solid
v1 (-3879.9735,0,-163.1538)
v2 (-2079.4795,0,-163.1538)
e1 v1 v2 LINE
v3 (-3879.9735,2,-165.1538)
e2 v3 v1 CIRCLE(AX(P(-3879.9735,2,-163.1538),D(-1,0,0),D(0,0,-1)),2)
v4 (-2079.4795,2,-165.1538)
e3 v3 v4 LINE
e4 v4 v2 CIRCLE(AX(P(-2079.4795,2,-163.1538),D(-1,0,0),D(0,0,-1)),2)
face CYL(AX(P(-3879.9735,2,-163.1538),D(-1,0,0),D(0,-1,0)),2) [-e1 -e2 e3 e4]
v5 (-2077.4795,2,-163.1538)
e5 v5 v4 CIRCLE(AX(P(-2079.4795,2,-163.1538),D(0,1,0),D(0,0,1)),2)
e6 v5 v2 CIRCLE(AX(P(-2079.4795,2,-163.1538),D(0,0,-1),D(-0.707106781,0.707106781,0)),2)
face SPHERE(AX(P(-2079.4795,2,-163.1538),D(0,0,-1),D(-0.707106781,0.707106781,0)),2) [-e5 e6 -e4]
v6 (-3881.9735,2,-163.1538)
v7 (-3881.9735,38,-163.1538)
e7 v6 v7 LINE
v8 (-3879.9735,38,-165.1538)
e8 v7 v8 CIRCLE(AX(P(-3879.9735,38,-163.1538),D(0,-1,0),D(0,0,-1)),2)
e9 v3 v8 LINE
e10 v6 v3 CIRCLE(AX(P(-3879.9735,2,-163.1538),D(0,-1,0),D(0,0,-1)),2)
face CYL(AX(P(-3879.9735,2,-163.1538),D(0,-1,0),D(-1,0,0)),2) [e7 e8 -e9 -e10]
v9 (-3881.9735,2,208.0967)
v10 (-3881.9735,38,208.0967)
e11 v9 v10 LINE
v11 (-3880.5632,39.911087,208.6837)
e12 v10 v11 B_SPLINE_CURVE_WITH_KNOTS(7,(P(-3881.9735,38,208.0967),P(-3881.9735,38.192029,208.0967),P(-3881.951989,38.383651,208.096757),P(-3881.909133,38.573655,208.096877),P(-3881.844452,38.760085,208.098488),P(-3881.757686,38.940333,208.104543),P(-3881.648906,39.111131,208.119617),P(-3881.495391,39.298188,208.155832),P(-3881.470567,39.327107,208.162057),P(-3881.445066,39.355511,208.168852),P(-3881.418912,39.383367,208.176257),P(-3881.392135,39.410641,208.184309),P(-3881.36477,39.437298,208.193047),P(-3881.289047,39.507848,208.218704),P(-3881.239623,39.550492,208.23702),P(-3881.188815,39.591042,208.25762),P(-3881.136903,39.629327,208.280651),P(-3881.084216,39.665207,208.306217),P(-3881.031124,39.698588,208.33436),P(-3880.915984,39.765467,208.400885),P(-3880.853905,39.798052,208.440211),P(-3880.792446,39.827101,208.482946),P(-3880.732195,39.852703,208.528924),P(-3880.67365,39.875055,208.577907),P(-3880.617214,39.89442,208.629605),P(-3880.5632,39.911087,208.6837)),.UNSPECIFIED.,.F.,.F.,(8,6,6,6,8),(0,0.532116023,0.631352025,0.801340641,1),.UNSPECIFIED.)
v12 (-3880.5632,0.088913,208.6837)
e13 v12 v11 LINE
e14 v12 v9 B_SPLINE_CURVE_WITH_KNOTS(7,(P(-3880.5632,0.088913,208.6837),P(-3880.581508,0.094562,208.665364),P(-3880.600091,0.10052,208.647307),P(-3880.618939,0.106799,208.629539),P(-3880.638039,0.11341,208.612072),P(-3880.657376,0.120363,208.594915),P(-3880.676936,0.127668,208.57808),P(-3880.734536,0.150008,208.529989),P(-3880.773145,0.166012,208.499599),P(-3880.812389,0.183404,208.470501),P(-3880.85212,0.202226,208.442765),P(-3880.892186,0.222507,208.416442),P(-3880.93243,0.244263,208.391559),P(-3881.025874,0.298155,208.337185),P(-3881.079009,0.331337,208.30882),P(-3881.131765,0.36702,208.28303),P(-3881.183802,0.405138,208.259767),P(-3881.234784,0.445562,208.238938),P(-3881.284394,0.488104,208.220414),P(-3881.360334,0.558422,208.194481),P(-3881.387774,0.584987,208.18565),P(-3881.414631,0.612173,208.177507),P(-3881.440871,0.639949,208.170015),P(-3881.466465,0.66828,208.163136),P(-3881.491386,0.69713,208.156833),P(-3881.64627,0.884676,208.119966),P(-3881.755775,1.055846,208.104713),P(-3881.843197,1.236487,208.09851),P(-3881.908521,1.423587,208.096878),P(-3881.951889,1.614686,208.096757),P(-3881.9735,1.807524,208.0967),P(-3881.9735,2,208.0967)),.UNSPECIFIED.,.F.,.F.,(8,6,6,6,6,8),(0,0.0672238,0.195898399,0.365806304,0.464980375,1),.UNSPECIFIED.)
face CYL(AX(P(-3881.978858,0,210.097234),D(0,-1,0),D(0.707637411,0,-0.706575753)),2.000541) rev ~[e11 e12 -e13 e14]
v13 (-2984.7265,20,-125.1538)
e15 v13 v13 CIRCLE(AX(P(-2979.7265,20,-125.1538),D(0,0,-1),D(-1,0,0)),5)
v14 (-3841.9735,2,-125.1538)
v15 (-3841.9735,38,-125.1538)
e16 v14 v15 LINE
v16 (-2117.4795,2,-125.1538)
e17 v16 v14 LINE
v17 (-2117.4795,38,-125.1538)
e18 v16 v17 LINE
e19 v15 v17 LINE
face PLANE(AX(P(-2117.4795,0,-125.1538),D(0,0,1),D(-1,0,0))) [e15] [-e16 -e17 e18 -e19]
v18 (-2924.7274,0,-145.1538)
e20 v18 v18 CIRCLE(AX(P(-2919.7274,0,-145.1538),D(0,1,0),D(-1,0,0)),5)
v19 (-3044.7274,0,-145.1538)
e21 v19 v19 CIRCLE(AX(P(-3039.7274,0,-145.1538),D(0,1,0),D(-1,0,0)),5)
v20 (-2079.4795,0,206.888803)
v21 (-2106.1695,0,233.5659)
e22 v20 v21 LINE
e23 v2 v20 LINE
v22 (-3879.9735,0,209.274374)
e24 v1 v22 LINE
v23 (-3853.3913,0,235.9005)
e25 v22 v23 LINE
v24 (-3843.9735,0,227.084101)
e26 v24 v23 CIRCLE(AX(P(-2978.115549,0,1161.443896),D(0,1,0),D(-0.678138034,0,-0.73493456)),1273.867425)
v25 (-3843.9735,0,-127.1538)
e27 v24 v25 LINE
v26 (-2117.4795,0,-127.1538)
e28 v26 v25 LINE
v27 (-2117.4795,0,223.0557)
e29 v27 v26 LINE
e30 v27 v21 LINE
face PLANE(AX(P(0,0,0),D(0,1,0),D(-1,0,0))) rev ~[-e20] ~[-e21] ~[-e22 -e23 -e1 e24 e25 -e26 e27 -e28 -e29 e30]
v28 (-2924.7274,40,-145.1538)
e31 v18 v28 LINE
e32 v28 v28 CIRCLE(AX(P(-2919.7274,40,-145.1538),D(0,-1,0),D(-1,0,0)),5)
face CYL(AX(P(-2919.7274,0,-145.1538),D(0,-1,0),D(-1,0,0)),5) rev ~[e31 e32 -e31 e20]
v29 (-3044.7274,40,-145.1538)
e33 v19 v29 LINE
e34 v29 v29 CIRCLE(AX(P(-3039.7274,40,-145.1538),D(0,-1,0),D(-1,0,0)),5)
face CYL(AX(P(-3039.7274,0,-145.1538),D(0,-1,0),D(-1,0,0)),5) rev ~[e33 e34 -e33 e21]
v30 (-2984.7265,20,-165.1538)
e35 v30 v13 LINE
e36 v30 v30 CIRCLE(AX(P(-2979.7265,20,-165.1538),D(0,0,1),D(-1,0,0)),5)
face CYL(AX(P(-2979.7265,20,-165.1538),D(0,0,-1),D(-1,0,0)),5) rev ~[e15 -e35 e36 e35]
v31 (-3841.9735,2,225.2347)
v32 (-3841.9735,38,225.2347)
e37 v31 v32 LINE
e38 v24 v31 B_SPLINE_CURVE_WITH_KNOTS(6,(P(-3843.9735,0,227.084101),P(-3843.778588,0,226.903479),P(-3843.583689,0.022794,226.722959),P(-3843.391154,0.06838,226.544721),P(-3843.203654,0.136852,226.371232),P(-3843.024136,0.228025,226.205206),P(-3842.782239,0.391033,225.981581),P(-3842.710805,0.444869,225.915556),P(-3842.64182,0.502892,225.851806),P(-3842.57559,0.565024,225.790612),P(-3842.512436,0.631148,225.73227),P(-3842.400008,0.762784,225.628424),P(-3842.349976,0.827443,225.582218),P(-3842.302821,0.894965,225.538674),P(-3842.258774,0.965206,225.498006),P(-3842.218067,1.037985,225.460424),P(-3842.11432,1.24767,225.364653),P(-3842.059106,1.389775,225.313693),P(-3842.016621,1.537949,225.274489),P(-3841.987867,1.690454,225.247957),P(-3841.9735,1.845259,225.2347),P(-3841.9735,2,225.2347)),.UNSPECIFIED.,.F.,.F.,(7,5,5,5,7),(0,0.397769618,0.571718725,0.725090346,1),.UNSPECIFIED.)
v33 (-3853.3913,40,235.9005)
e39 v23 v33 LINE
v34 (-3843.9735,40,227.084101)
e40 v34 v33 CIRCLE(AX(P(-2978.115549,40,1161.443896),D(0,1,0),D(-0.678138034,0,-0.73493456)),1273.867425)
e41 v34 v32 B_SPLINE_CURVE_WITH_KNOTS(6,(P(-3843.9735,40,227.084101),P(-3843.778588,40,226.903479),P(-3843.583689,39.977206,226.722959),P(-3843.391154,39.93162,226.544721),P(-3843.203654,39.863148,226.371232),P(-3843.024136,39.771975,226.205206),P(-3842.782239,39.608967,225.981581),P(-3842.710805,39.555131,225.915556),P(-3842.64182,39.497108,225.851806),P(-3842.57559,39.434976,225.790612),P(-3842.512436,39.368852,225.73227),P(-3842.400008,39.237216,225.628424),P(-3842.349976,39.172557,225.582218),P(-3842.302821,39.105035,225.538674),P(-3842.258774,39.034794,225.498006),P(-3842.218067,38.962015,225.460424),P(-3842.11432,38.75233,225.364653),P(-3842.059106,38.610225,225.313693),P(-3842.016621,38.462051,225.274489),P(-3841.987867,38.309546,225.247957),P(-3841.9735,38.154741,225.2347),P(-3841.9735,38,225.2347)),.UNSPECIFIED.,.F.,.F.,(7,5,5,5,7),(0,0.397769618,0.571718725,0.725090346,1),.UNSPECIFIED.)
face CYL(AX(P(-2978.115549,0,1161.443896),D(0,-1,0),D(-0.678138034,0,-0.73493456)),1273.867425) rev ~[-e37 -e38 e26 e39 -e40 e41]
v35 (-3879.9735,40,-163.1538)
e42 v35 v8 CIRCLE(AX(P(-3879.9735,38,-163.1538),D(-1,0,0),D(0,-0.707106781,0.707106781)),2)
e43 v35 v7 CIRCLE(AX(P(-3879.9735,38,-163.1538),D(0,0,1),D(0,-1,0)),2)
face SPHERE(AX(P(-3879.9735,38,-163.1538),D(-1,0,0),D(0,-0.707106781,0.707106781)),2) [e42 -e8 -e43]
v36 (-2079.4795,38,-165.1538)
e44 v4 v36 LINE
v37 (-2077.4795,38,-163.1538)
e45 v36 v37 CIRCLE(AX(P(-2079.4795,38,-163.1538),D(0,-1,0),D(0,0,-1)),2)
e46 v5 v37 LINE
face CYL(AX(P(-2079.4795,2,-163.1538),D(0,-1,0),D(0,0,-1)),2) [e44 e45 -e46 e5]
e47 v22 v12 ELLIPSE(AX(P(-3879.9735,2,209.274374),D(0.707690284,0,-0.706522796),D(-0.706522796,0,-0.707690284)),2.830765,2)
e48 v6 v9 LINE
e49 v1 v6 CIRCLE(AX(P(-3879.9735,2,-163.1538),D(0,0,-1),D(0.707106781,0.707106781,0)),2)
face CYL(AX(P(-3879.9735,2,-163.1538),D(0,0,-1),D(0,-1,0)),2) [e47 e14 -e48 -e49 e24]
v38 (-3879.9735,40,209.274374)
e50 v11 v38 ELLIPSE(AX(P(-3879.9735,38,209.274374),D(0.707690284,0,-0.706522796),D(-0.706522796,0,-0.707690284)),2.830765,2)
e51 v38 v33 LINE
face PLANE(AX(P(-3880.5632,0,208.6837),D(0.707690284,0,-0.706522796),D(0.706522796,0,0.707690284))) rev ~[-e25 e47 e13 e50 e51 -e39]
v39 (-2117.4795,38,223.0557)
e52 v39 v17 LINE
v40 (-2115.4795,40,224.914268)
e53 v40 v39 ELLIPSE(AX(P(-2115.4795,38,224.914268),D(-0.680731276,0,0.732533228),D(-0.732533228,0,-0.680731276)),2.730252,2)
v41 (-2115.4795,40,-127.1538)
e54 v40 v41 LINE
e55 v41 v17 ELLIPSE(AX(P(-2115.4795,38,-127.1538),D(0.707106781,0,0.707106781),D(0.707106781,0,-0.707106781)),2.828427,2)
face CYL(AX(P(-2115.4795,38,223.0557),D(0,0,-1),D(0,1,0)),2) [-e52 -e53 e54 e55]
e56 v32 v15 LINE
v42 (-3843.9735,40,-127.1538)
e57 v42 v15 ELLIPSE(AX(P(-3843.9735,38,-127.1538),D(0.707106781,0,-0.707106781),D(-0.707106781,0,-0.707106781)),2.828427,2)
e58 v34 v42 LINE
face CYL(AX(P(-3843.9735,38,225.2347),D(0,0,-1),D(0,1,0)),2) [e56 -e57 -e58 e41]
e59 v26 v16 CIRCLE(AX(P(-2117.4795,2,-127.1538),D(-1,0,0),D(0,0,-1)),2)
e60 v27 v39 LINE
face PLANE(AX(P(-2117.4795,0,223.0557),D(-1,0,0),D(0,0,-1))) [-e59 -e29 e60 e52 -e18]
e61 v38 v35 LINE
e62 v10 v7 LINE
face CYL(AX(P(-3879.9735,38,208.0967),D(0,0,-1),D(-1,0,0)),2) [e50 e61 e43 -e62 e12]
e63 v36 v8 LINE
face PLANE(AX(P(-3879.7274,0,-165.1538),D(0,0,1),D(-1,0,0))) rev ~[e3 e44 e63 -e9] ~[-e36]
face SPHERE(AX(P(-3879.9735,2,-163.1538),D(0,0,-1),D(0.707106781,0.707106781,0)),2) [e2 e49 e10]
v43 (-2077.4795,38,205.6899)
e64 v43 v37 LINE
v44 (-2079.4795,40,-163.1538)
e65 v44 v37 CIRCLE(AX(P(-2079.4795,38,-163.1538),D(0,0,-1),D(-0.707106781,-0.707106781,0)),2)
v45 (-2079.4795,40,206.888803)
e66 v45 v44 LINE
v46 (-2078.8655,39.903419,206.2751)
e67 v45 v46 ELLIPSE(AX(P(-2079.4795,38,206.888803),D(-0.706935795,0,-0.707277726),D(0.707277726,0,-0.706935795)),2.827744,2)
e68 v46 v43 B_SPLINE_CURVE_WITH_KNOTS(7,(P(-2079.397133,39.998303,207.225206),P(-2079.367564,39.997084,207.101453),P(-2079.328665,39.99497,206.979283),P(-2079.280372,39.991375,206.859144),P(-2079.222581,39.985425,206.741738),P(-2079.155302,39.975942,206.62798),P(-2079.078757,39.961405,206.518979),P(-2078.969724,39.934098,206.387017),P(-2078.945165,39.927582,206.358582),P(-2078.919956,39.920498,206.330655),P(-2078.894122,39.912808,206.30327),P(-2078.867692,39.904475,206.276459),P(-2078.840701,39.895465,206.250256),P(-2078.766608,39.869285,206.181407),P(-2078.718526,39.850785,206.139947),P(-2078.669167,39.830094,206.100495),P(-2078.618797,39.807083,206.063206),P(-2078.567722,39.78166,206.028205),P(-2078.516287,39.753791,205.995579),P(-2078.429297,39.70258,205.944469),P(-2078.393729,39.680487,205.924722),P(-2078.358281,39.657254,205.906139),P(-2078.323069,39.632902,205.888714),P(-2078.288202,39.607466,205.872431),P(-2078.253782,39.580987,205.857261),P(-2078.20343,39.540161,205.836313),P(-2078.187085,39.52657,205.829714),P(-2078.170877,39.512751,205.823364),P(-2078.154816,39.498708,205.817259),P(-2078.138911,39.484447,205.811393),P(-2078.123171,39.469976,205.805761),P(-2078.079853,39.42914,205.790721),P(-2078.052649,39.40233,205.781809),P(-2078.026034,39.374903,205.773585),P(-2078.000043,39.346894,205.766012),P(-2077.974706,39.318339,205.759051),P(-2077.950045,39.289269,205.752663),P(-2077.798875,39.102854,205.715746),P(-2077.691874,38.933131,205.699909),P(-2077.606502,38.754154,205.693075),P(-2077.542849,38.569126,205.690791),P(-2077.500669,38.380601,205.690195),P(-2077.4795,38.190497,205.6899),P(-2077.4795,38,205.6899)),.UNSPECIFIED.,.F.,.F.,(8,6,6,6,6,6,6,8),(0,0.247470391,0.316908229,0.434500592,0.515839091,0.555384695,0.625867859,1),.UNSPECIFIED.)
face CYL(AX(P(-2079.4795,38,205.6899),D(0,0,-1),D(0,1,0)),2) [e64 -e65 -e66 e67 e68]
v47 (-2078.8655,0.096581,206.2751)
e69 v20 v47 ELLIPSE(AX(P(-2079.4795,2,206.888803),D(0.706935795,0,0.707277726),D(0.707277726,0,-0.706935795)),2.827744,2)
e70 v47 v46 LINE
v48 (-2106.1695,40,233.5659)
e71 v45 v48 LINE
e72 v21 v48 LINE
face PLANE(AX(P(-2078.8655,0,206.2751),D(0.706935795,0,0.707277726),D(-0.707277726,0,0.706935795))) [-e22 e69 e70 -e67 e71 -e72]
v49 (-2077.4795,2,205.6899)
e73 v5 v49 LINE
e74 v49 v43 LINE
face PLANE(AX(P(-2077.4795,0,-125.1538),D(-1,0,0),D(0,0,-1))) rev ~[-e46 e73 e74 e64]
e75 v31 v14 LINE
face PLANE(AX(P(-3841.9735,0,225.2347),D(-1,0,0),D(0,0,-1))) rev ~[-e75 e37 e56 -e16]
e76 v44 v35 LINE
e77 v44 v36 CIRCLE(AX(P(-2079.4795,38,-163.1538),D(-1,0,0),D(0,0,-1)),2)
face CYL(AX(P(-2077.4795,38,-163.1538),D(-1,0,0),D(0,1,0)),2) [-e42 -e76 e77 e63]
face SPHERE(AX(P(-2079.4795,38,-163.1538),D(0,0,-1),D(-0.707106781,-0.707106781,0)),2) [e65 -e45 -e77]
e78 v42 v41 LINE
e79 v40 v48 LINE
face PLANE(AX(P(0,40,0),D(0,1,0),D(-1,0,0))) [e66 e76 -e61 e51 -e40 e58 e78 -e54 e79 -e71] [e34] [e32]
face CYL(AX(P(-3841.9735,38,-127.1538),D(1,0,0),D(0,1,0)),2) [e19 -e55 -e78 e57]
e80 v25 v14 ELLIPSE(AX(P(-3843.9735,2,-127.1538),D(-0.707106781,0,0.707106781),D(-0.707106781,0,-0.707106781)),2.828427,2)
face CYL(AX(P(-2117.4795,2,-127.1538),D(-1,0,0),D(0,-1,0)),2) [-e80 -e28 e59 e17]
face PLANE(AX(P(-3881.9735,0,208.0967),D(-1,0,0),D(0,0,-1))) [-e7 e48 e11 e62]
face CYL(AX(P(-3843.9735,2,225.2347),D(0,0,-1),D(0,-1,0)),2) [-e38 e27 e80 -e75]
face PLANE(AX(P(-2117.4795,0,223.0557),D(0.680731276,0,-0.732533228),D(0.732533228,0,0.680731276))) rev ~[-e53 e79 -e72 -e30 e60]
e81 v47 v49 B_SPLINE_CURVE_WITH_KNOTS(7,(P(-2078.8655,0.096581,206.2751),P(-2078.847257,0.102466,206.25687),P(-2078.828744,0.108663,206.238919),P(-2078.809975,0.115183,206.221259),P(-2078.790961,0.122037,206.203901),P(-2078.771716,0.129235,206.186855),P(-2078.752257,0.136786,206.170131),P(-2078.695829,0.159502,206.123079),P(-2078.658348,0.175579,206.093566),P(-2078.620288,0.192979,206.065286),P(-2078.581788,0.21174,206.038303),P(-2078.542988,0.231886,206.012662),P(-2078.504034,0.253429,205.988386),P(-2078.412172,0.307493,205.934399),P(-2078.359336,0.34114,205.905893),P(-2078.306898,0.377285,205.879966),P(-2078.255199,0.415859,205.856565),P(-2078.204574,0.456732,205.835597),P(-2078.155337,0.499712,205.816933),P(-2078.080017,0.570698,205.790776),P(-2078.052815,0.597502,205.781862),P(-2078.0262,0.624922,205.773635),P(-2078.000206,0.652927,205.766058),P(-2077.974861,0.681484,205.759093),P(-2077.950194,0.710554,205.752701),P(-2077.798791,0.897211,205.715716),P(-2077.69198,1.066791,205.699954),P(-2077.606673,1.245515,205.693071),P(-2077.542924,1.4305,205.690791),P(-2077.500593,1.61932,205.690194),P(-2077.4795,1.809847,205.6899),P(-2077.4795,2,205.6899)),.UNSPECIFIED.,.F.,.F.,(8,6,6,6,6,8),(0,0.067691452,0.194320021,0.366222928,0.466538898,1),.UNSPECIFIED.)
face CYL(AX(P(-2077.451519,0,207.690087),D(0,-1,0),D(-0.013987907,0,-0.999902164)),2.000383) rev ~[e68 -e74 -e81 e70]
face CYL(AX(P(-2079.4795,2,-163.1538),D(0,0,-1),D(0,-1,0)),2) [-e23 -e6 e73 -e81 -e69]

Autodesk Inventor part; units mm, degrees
ref_plane "YZ Plane" through (0, 0, 0) normal (1, 0, 0) x (0, 1, 0)
ref_plane "XZ Plane" through (0, 0, 0) normal (0, 1, 0) x (-1, 0, 0)
ref_plane "XY Plane" through (0, 0, 0) normal (0, 0, 1) x (1, 0, 0)
sketch "Sketch1" plane through (0, 0, 0) normal (0, 1, 0) x (-1, 0, 0)
  line L0 (3880.5632, 208.6837) -> (3853.3913, 235.9005)
  arc A0 (3880.5632, 208.6837) -> (3881.9735, 208.0967) centre (3881.9785, 210.0967) ccw
  line L1 (2078.8655, 206.2751) -> (2106.1695, 233.5659)
  arc A1 (2077.4795, 205.6899) -> (2078.8655, 206.2751) centre (2077.4516, 207.6897) ccw
  arc A2 (3883.0351, 262.7329) -> (3883.0378, 262.7357) centre (2978.5428, 1160.9837) ccw
  arc A3 (3881.9735, 261.6652) -> (3881.9774, 261.6692) centre (2978.5428, 1160.9837) ccw
  line L2 (2979.7274, -125.1538) -> (3881.9735, -125.1538)
  line L3 (3879.7274, -165.1538) -> (2079.7274, -165.1538)
  line L4 (2079.7274, -125.1538) -> (2979.7274, -125.1538)
  line L5 (3879.7274, -165.1538) -> (3881.9735, -165.1538)
  line L6 (2079.7274, -165.1538) -> (2077.4795, -165.1538)
  line L7 (2117.4795, -125.1538) -> (2077.4795, -125.1538)
  line L8 (2089.1735, -125.1538) -> (3870.2812, -125.1538)
  line L9 (2077.4795, 205.6899) -> (2077.4795, -165.1538)
  line L10 (2117.4795, 223.0557) -> (2117.4795, -125.1538)
  line L11 (3881.9735, 208.0967) -> (3881.9735, -165.1538)
  line L12 (3841.9735, 225.2347) -> (3841.9735, -125.1538)
  line L13 (3841.9735, -125.1538) -> (3881.9735, -125.1538)
  arc A4 (3841.9735, 225.2347) -> (3853.3913, 235.9005) centre (2978.5428, 1160.9837) ccw
  line L14 (2117.4795, 223.0557) -> (2106.1695, 233.5659)
  line L15 (3039.7274, -165.1538) -> (3039.7274, -145.1538)
  circle A5 centre (3039.7274, -145.1538) radius 5
  circle A6 centre (2919.7274, -145.1538) radius 5
  point P0 (0, 0)
  point P1 (2077.4509, 204.8613)
  point P2 (2106.1378, 233.5957)
  point P3 (2712.3694, -125.1538)
  dimension "d20" = 40
  dimension "d21" = 40
extrude "Extrusion1" add sketch "Sketch1" along normal blind 40 contours A0 L11 L2 L12 A4 L0 | L11 L5 L3 L6 L9 L7 L4 L2 | L4 L7 L9 A1 L1 L14 L10 | A5 | A6
fillet "Fillet1" radius 2 10 edges at (-3841.9735, 40, 50.0404) (-2979.7265, 40, -125.1538) (-3881.9735, 40, -145.1538) (-3881.9735, 40, 41.4714) (-2978.6034, 40, -165.1538) (-2077.4795, 40, 40.268) (-2077.4795, 40, -145.1538) (-2117.4795, 40, 48.9509) (-3841.9735, 0, 50.0404) (-2979.7265, 0, -125.1538)
fillet "Fillet2" radius 2 9 edges at (-2077.4795, 0, 40.268) (-2077.4795, 0, -145.1538) (-2978.6034, 0, -165.1538) (-2078.0653, 39.4142, -164.568) (-2077.4795, 19, -165.1538) (-3881.3877, 39.4142, -164.568) (-3881.9735, 19, -165.1538) (-3881.9735, 0, 41.4714) (-3881.9735, 0, -145.1538)
sketch "Sketch2" plane through (-2079.4795, 2, -165.1538) normal (0, 0, -1) x (-1, 0, 0)
  line L0 (0, 0) -> (0, 36) projected
  line L1 (0, 18) -> (1800.494, 18)
  line L2 (1800.494, 36) -> (1800.494, 0) projected
  circle A0 centre (900.247, 18) radius 5
  point P0 (-2079.4795, -2)
  dimension "d27" = 10
extrude "Extrusion2" cut sketch "Sketch2" against normal blind 50
extrude "Extrusion3" cut sketch "Sketch1" along normal blind 60 contours A5 | A6
properties part number "BASE_FUNDO_SUPORTE_LAMINA"
